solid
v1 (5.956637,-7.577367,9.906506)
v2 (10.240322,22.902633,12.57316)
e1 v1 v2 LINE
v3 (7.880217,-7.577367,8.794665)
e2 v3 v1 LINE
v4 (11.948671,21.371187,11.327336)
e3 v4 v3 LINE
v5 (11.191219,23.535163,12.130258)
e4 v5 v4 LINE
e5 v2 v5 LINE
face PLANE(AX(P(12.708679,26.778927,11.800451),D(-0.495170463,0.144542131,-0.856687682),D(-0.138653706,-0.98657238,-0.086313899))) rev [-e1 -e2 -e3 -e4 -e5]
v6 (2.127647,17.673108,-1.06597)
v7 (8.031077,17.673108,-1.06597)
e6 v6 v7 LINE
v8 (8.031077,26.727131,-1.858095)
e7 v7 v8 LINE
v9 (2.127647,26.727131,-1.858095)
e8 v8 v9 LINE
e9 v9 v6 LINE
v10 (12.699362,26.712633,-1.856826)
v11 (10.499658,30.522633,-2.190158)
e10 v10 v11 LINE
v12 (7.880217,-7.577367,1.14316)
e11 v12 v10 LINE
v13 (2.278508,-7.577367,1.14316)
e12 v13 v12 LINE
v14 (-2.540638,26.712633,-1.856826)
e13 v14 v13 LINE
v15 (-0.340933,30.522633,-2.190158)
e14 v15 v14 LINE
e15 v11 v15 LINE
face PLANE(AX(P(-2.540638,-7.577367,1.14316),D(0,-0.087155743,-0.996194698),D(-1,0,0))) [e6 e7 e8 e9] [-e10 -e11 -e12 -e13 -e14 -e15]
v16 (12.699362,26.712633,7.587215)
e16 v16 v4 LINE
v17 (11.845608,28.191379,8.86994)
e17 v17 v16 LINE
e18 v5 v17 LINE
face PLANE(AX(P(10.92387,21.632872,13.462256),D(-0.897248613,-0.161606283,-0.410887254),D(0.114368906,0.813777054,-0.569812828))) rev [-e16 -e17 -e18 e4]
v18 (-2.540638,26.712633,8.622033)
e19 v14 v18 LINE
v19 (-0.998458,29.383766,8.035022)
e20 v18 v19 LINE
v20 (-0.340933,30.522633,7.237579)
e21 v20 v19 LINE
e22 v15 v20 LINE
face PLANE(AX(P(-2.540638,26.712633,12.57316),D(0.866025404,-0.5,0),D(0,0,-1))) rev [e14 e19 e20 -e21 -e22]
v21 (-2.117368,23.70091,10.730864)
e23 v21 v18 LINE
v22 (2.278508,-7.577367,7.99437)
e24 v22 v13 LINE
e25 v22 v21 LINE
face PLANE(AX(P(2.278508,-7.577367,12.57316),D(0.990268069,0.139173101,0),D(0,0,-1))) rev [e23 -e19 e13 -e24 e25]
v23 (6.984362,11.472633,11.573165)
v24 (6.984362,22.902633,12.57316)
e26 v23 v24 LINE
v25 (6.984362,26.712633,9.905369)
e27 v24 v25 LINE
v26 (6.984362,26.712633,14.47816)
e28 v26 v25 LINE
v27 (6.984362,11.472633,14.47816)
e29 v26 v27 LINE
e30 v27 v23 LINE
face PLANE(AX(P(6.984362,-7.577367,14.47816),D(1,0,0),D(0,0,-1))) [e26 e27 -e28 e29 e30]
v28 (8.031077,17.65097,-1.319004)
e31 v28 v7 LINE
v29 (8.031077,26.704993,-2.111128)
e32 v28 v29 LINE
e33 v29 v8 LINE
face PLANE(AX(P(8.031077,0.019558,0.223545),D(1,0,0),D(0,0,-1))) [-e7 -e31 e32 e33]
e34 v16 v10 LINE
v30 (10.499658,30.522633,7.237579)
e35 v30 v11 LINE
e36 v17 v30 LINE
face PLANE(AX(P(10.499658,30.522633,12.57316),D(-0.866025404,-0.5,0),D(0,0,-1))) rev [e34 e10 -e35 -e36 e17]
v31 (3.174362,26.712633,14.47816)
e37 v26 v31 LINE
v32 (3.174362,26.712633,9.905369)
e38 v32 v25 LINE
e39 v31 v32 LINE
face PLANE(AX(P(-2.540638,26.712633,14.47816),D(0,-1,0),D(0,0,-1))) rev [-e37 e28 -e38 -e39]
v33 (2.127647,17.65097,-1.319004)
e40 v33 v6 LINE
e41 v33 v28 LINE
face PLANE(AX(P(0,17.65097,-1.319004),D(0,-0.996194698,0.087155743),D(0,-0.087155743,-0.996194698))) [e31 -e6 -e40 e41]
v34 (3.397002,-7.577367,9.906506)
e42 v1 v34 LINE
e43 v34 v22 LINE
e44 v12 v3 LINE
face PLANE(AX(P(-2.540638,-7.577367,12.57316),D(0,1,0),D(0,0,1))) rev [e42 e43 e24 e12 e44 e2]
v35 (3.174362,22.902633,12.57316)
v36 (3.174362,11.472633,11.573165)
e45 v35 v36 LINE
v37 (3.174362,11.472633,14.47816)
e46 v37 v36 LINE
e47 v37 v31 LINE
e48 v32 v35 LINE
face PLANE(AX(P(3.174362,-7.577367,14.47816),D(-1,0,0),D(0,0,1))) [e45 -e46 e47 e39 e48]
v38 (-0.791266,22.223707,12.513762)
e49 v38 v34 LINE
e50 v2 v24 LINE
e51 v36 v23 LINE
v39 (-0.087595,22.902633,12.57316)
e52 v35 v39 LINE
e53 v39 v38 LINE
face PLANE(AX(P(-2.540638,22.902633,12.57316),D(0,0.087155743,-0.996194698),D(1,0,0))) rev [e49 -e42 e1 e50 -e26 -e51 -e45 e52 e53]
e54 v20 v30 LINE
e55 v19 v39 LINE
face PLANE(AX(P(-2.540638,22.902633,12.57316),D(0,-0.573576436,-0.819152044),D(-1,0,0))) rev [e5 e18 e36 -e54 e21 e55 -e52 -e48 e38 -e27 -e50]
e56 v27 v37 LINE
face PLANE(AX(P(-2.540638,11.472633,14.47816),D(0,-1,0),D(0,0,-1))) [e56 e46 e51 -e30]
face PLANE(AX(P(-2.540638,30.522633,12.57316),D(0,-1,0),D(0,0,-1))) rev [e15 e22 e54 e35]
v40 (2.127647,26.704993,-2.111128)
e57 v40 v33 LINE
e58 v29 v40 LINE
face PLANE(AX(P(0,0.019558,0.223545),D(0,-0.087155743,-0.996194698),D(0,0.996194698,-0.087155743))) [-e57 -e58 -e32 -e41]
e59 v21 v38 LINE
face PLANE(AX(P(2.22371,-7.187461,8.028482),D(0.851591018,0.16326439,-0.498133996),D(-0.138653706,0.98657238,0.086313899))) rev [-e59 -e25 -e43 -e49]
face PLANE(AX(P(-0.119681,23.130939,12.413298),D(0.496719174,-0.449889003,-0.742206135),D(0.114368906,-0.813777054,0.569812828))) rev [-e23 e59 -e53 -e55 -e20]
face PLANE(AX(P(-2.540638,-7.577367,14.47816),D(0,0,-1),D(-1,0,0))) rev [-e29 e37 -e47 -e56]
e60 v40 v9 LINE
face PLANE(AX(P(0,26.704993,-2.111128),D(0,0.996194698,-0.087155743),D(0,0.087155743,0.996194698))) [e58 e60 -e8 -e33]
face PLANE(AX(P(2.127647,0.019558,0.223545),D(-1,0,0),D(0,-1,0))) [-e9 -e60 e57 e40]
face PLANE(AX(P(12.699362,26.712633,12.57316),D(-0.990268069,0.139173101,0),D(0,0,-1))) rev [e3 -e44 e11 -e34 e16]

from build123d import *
from OCP.BRepFilletAPI import BRepFilletAPI_MakeChamfer

# Parameters (mm, degrees)
SKETCH1_W           = 10.16
SKETCH1_H           = 25.4
BOSS_EXTRUDE1_DEPTH = 10.16
CHAMFER1_SIZE       = 5.08
CHAMFER1_SIZE2      = 3.557054294
CHAMFER6_SIZE       = 22.86
CHAMFER6_SIZE2      = 3.212763481
CHAMFER7_SIZE       = 22.86
CHAMFER7_SIZE2      = 3.212763481
CHAMFER10_SIZE2     = 1.466469684
CHAMFER10_SIZE      = 2.54
CHAMFER11_SIZE2     = 2.54
CHAMFER11_SIZE      = 1.466469684
BOSS_EXTRUDE2_DEPTH = 11.43
CHAMFER12_SIZE      = 20.32
CHAMFER12_SIZE_2    = 1.777769643
CHAMFER13_SIZE      = 1.27
CHAMFER13_SIZE2     = 0.703075315
CHAMFER13_SIZE2_2   = 0.738460687
CHAMFER14_SIZE      = 1.27
CHAMFER14_SIZE2     = 0.703075315
CHAMFER14_SIZE2_2   = 0.738460687
CHAMFER15_SIZE      = 29.032332849
CHAMFER15_SIZE_2    = 2.54
SCALE1_SCALE        = 1.5
BOSS_EXTRUDE4_DEPTH = 0.254


# Some blends are built 0.0001 mm under size
with BuildPart() as part:
    # Sketch1 → Boss-Extrude1 (new body)
    with BuildSketch(Plane.XY):
        with Locations((5.08, 12.7)):
            Rectangle(SKETCH1_W, SKETCH1_H)
    extrude(amount=BOSS_EXTRUDE1_DEPTH)

    # Chamfer1
    chamfer1_edges = [part.edges().sort_by_distance(p)[0] for p in [
        (5.08, 25.4, 10.16),
    ]]
    chamfer1_side = [part.faces().sort_by_distance(p)[0] for p in [
        (5.08, 12.7, 10.16),
    ]]
    chamfer(chamfer1_edges, length=CHAMFER1_SIZE, length2=CHAMFER1_SIZE2, reference=chamfer1_side[0])

    # Chamfer6
    chamfer6_edges = [part.edges().sort_by_distance(p)[0] for p in [
        (0, 0, 5.08),
    ]]
    chamfer6_side = [part.faces().sort_by_distance(p)[0] for p in [
        (0, 12.300671821, 4.93871201),
    ]]
    chamfer(chamfer6_edges, length=CHAMFER6_SIZE, length2=CHAMFER6_SIZE2, reference=chamfer6_side[0])

    # Chamfer7
    chamfer7_edges = [part.edges().sort_by_distance(p)[0] for p in [
        (10.16, 0, 5.08),
    ]]
    chamfer7_side = [part.faces().sort_by_distance(p)[0] for p in [
        (10.16, 12.300671821, 4.93871201),
    ]]
    chamfer(chamfer7_edges, length=CHAMFER7_SIZE, length2=CHAMFER7_SIZE2, reference=chamfer7_side[0])

    # Chamfer10
    chamfer10_edges = [part.edges().sort_by_distance(p)[0] for p in [
        (0, 25.4, 3.301472853),
    ]]
    chamfer10_side = [part.faces().sort_by_distance(p)[0] for p in [
        (0, 25.370670606, 3.301472853),
    ]]
    chamfer(chamfer10_edges, length=CHAMFER10_SIZE - 0.0001, length2=CHAMFER10_SIZE2 - 0.0001, reference=chamfer10_side[0])  # a hair under: the kernel refuses the full size

    # Chamfer11
    chamfer11_edges = [part.edges().sort_by_distance(p)[0] for p in [
        (10.16, 25.4, 3.301472853),
    ]]
    chamfer11_side = [part.faces().sort_by_distance(p)[0] for p in [
        (10.130670606, 25.4, 3.301472853),
    ]]
    chamfer(chamfer11_edges, length=CHAMFER11_SIZE - 0.0001, length2=CHAMFER11_SIZE2 - 0.0001, reference=chamfer11_side[0])  # a hair under: the kernel refuses the full size

    # Sketch2 → Boss-Extrude2 (add)
    with BuildSketch(Plane(origin=(0, 0, 0), x_dir=(-1, 0, 0), z_dir=(0, 0, -1))):
        Polygon((-5.08, 22.86), (-3.81, 22.86), (-3.81, 12.7), (-5.08, 12.7), (-6.35, 12.7), (-6.35, 22.86), align=None)
    extrude(amount=-BOSS_EXTRUDE2_DEPTH)

    # Chamfer12
    # the kernel refuses this chamfer: 20.32, 1.777769643 mm, written as the material it takes off along each edge
    with BuildSketch(Plane(origin=(-49.611801021, 0, 10.16), x_dir=(0, 0.9999943799678764, 0.003352615794033212), z_dir=(1, 0, 0))) as chamfer12_piece_1_section:
        Polygon((CHAMFER12_SIZE * 0.999994379968, -CHAMFER12_SIZE * 0.00335261579403), (-CHAMFER12_SIZE_2 * 0.00335261579374, -CHAMFER12_SIZE_2 * 0.999994379882), (0, 0), align=None)
    chamfer12_piece_1 = extrude(amount=109.383602042, mode=Mode.PRIVATE)
    chamfer12_piece_1 = split(chamfer12_piece_1, bisect_by=Plane(origin=(3.81, 16.274065634, 10.201831789), z_dir=(-1, 0, 0)), keep=Keep.TOP, mode=Mode.PRIVATE)
    chamfer12_piece_1 = split(chamfer12_piece_1, bisect_by=Plane(origin=(-22.90090051, 12.7, 10.201831789), z_dir=(0, 1, 0)), keep=Keep.TOP, mode=Mode.PRIVATE)
    add(chamfer12_piece_1, mode=Mode.SUBTRACT)
    with BuildSketch(Plane(origin=(-49.611801021, 0, 10.16), x_dir=(0, 0.9999943799678764, 0.003352615794033212), z_dir=(1, 0, 0))) as chamfer12_piece_2_section:
        Polygon((CHAMFER12_SIZE * 0.999994379968, -CHAMFER12_SIZE * 0.00335261579403), (-CHAMFER12_SIZE_2 * 0.00335261579374, -CHAMFER12_SIZE_2 * 0.999994379882), (0, 0), align=None)
    chamfer12_piece_2 = extrude(amount=109.383602042, mode=Mode.PRIVATE)
    chamfer12_piece_2 = split(chamfer12_piece_2, bisect_by=Plane(origin=(3.81, 5.349834898, 9.691469829), z_dir=(-1, 0, 0)), keep=Keep.TOP, mode=Mode.PRIVATE)
    chamfer12_piece_2 = split(chamfer12_piece_2, bisect_by=Plane(origin=(-22.90090051, 12.7, 9.691469829), z_dir=(0, -1, 0)), keep=Keep.TOP, mode=Mode.PRIVATE)
    add(chamfer12_piece_2, mode=Mode.SUBTRACT)
    with BuildSketch(Plane(origin=(-49.611801021, 0, 10.16), x_dir=(0, 0.9999943799678764, 0.003352615794033212), z_dir=(1, 0, 0))) as chamfer12_piece_3_section:
        Polygon((CHAMFER12_SIZE * 0.999994379968, -CHAMFER12_SIZE * 0.00335261579403), (-CHAMFER12_SIZE_2 * 0.00335261579374, -CHAMFER12_SIZE_2 * 0.999994379882), (0, 0), align=None)
    chamfer12_piece_3 = extrude(amount=109.383602042, mode=Mode.PRIVATE)
    chamfer12_piece_3 = split(chamfer12_piece_3, bisect_by=Plane(origin=(3.81, 5.349834898, 9.691469829), z_dir=(1, 0, 0)), keep=Keep.TOP, mode=Mode.PRIVATE)
    chamfer12_piece_3 = split(chamfer12_piece_3, bisect_by=Plane(origin=(5.08, 12.7, 9.691469829), z_dir=(0, -1, 0)), keep=Keep.TOP, mode=Mode.PRIVATE)
    chamfer12_piece_3 = split(chamfer12_piece_3, bisect_by=Plane(origin=(6.35, 5.349834898, 9.691469829), z_dir=(-1, 0, 0)), keep=Keep.TOP, mode=Mode.PRIVATE)
    add(chamfer12_piece_3, mode=Mode.SUBTRACT)
    with BuildSketch(Plane(origin=(-49.611801021, 0, 10.16), x_dir=(0, 0.9999943799678764, 0.003352615794033212), z_dir=(1, 0, 0))) as chamfer12_piece_4_section:
        Polygon((CHAMFER12_SIZE * 0.999994379968, -CHAMFER12_SIZE * 0.00335261579403), (-CHAMFER12_SIZE_2 * 0.00335261579374, -CHAMFER12_SIZE_2 * 0.999994379882), (0, 0), align=None)
    chamfer12_piece_4 = extrude(amount=109.383602042, mode=Mode.PRIVATE)
    chamfer12_piece_4 = split(chamfer12_piece_4, bisect_by=Plane(origin=(33.06090051, 12.7, 10.201831789), z_dir=(0, 1, 0)), keep=Keep.TOP, mode=Mode.PRIVATE)
    chamfer12_piece_4 = split(chamfer12_piece_4, bisect_by=Plane(origin=(6.35, 16.274065634, 10.201831789), z_dir=(1, 0, 0)), keep=Keep.TOP, mode=Mode.PRIVATE)
    add(chamfer12_piece_4, mode=Mode.SUBTRACT)
    with BuildSketch(Plane(origin=(-49.611801021, 0, 10.16), x_dir=(0, 0.9999943799678764, 0.003352615794033212), z_dir=(1, 0, 0))) as chamfer12_piece_5_section:
        Polygon((CHAMFER12_SIZE * 0.999994379968, -CHAMFER12_SIZE * 0.00335261579403), (-CHAMFER12_SIZE_2 * 0.00335261579374, -CHAMFER12_SIZE_2 * 0.999994379882), (0, 0), align=None)
    chamfer12_piece_5 = extrude(amount=109.383602042, mode=Mode.PRIVATE)
    chamfer12_piece_5 = split(chamfer12_piece_5, bisect_by=Plane(origin=(33.06090051, 12.7, 9.691469829), z_dir=(0, -1, 0)), keep=Keep.TOP, mode=Mode.PRIVATE)
    chamfer12_piece_5 = split(chamfer12_piece_5, bisect_by=Plane(origin=(6.35, 5.349834898, 9.691469829), z_dir=(1, 0, 0)), keep=Keep.TOP, mode=Mode.PRIVATE)
    add(chamfer12_piece_5, mode=Mode.SUBTRACT)

    # Chamfer13: one chamfer whose edges measure the first distance from different faces: ONE call of the kernel's chamfer builder (chamfer() names one face for all edges)
    chamfer13_edges_1 = [part.edges().sort_by_distance(p)[0] for p in [
        (0.17848686, 21.59, 9.270736426),
    ]]
    chamfer13_side_1 = [part.faces().sort_by_distance(p)[0] for p in [
        (5.08, 22.944432903, 8.322352298),
    ]]
    chamfer13_edges_2 = [part.edges().sort_by_distance(p)[0] for p in [
        (1.784868601, 10.16, 9.271115179),
    ]]
    chamfer13_side_2 = [part.faces().sort_by_distance(p)[0] for p in [
        (1.566458565, 11.714068156, 4.649741863),
    ]]
    chamfer13 = BRepFilletAPI_MakeChamfer(part.part.solid().wrapped)
    for e in chamfer13_edges_1:
        chamfer13.Add(CHAMFER13_SIZE, CHAMFER13_SIZE2, e.wrapped, chamfer13_side_1[0].wrapped)  # the first distance lies on this face
    for e in chamfer13_edges_2:
        chamfer13.Add(CHAMFER13_SIZE, CHAMFER13_SIZE2_2, e.wrapped, chamfer13_side_2[0].wrapped)  # the first distance lies on this face
    add(Compound.cast(chamfer13.Shape()), mode=Mode.REPLACE)

    # Chamfer14: one chamfer whose edges measure the first distance from different faces: ONE call of the kernel's chamfer builder (chamfer() names one face for all edges)
    chamfer14_edges_1 = [part.edges().sort_by_distance(p)[0] for p in [
        (9.98151314, 21.59, 9.270736426),
    ]]
    chamfer14_side_1 = [part.faces().sort_by_distance(p)[0] for p in [
        (8.593541435, 11.714068156, 4.649741863),
    ]]
    chamfer14_edges_2 = [part.edges().sort_by_distance(p)[0] for p in [
        (8.375131399, 10.16, 9.271115179),
    ]]
    chamfer14_side_2 = [part.faces().sort_by_distance(p)[0] for p in [
        (5.530551527, 10.889375046, 9.334927227),
    ]]
    chamfer14 = BRepFilletAPI_MakeChamfer(part.part.solid().wrapped)
    for e in chamfer14_edges_1:
        chamfer14.Add(CHAMFER14_SIZE, CHAMFER14_SIZE2, e.wrapped, chamfer14_side_1[0].wrapped)  # the first distance lies on this face
    for e in chamfer14_edges_2:
        chamfer14.Add(CHAMFER14_SIZE, CHAMFER14_SIZE2_2, e.wrapped, chamfer14_side_2[0].wrapped)  # the first distance lies on this face
    add(Compound.cast(chamfer14.Shape()), mode=Mode.REPLACE)

    # Chamfer15
    # the kernel refuses this chamfer: 29.032332849, 2.54 mm, written as the material it takes off along each edge
    with BuildSketch(Plane(origin=(-72.26067841, 0, 0), x_dir=(0, 0.9999943799678764, -0.0033526157940330635), z_dir=(1, 0, 0))) as chamfer15_piece_1:
        Polygon((CHAMFER15_SIZE * 0.999994379968, CHAMFER15_SIZE * 0.00335261579403), (-CHAMFER15_SIZE_2 * 0.00335261579403, CHAMFER15_SIZE_2 * 0.999994379968), (0, 0), align=None)
    extrude(amount=154.68135682, mode=Mode.SUBTRACT)


with BuildPart() as part_1:
    # Scale1: scaled about (5.081275253, 15.154751407, 5.333676916)
    add(part.part.scale(SCALE1_SCALE).moved(Location((-2.540637627, -7.577375703, -2.666838458))))


with BuildPart() as boss_extrude4_tool:
    # Sketch5 → Boss-Extrude4 (new body)
    with BuildSketch(Plane(origin=(0, 0.041695217, 0.476578517), x_dir=(-1, 0, 0), z_dir=(0, -0.08715574274765502, -0.9961946980917459))):
        Polygon((-8.031077325, 26.787369773), (-5.079362375, 26.787369773), (-2.127647425, 26.787369773), (-2.127647425, 17.698761839), (-8.031077325, 17.698761839), align=None)
    extrude(amount=BOSS_EXTRUDE4_DEPTH)


with BuildPart() as part_2:
    add(part_1.part)


with BuildPart() as part_3:
    # Boss-Extrude4: joined with boss_extrude4_tool
    add(part_2.part.fuse(boss_extrude4_tool.part, tol=0.00001))


solid = part_3.part
